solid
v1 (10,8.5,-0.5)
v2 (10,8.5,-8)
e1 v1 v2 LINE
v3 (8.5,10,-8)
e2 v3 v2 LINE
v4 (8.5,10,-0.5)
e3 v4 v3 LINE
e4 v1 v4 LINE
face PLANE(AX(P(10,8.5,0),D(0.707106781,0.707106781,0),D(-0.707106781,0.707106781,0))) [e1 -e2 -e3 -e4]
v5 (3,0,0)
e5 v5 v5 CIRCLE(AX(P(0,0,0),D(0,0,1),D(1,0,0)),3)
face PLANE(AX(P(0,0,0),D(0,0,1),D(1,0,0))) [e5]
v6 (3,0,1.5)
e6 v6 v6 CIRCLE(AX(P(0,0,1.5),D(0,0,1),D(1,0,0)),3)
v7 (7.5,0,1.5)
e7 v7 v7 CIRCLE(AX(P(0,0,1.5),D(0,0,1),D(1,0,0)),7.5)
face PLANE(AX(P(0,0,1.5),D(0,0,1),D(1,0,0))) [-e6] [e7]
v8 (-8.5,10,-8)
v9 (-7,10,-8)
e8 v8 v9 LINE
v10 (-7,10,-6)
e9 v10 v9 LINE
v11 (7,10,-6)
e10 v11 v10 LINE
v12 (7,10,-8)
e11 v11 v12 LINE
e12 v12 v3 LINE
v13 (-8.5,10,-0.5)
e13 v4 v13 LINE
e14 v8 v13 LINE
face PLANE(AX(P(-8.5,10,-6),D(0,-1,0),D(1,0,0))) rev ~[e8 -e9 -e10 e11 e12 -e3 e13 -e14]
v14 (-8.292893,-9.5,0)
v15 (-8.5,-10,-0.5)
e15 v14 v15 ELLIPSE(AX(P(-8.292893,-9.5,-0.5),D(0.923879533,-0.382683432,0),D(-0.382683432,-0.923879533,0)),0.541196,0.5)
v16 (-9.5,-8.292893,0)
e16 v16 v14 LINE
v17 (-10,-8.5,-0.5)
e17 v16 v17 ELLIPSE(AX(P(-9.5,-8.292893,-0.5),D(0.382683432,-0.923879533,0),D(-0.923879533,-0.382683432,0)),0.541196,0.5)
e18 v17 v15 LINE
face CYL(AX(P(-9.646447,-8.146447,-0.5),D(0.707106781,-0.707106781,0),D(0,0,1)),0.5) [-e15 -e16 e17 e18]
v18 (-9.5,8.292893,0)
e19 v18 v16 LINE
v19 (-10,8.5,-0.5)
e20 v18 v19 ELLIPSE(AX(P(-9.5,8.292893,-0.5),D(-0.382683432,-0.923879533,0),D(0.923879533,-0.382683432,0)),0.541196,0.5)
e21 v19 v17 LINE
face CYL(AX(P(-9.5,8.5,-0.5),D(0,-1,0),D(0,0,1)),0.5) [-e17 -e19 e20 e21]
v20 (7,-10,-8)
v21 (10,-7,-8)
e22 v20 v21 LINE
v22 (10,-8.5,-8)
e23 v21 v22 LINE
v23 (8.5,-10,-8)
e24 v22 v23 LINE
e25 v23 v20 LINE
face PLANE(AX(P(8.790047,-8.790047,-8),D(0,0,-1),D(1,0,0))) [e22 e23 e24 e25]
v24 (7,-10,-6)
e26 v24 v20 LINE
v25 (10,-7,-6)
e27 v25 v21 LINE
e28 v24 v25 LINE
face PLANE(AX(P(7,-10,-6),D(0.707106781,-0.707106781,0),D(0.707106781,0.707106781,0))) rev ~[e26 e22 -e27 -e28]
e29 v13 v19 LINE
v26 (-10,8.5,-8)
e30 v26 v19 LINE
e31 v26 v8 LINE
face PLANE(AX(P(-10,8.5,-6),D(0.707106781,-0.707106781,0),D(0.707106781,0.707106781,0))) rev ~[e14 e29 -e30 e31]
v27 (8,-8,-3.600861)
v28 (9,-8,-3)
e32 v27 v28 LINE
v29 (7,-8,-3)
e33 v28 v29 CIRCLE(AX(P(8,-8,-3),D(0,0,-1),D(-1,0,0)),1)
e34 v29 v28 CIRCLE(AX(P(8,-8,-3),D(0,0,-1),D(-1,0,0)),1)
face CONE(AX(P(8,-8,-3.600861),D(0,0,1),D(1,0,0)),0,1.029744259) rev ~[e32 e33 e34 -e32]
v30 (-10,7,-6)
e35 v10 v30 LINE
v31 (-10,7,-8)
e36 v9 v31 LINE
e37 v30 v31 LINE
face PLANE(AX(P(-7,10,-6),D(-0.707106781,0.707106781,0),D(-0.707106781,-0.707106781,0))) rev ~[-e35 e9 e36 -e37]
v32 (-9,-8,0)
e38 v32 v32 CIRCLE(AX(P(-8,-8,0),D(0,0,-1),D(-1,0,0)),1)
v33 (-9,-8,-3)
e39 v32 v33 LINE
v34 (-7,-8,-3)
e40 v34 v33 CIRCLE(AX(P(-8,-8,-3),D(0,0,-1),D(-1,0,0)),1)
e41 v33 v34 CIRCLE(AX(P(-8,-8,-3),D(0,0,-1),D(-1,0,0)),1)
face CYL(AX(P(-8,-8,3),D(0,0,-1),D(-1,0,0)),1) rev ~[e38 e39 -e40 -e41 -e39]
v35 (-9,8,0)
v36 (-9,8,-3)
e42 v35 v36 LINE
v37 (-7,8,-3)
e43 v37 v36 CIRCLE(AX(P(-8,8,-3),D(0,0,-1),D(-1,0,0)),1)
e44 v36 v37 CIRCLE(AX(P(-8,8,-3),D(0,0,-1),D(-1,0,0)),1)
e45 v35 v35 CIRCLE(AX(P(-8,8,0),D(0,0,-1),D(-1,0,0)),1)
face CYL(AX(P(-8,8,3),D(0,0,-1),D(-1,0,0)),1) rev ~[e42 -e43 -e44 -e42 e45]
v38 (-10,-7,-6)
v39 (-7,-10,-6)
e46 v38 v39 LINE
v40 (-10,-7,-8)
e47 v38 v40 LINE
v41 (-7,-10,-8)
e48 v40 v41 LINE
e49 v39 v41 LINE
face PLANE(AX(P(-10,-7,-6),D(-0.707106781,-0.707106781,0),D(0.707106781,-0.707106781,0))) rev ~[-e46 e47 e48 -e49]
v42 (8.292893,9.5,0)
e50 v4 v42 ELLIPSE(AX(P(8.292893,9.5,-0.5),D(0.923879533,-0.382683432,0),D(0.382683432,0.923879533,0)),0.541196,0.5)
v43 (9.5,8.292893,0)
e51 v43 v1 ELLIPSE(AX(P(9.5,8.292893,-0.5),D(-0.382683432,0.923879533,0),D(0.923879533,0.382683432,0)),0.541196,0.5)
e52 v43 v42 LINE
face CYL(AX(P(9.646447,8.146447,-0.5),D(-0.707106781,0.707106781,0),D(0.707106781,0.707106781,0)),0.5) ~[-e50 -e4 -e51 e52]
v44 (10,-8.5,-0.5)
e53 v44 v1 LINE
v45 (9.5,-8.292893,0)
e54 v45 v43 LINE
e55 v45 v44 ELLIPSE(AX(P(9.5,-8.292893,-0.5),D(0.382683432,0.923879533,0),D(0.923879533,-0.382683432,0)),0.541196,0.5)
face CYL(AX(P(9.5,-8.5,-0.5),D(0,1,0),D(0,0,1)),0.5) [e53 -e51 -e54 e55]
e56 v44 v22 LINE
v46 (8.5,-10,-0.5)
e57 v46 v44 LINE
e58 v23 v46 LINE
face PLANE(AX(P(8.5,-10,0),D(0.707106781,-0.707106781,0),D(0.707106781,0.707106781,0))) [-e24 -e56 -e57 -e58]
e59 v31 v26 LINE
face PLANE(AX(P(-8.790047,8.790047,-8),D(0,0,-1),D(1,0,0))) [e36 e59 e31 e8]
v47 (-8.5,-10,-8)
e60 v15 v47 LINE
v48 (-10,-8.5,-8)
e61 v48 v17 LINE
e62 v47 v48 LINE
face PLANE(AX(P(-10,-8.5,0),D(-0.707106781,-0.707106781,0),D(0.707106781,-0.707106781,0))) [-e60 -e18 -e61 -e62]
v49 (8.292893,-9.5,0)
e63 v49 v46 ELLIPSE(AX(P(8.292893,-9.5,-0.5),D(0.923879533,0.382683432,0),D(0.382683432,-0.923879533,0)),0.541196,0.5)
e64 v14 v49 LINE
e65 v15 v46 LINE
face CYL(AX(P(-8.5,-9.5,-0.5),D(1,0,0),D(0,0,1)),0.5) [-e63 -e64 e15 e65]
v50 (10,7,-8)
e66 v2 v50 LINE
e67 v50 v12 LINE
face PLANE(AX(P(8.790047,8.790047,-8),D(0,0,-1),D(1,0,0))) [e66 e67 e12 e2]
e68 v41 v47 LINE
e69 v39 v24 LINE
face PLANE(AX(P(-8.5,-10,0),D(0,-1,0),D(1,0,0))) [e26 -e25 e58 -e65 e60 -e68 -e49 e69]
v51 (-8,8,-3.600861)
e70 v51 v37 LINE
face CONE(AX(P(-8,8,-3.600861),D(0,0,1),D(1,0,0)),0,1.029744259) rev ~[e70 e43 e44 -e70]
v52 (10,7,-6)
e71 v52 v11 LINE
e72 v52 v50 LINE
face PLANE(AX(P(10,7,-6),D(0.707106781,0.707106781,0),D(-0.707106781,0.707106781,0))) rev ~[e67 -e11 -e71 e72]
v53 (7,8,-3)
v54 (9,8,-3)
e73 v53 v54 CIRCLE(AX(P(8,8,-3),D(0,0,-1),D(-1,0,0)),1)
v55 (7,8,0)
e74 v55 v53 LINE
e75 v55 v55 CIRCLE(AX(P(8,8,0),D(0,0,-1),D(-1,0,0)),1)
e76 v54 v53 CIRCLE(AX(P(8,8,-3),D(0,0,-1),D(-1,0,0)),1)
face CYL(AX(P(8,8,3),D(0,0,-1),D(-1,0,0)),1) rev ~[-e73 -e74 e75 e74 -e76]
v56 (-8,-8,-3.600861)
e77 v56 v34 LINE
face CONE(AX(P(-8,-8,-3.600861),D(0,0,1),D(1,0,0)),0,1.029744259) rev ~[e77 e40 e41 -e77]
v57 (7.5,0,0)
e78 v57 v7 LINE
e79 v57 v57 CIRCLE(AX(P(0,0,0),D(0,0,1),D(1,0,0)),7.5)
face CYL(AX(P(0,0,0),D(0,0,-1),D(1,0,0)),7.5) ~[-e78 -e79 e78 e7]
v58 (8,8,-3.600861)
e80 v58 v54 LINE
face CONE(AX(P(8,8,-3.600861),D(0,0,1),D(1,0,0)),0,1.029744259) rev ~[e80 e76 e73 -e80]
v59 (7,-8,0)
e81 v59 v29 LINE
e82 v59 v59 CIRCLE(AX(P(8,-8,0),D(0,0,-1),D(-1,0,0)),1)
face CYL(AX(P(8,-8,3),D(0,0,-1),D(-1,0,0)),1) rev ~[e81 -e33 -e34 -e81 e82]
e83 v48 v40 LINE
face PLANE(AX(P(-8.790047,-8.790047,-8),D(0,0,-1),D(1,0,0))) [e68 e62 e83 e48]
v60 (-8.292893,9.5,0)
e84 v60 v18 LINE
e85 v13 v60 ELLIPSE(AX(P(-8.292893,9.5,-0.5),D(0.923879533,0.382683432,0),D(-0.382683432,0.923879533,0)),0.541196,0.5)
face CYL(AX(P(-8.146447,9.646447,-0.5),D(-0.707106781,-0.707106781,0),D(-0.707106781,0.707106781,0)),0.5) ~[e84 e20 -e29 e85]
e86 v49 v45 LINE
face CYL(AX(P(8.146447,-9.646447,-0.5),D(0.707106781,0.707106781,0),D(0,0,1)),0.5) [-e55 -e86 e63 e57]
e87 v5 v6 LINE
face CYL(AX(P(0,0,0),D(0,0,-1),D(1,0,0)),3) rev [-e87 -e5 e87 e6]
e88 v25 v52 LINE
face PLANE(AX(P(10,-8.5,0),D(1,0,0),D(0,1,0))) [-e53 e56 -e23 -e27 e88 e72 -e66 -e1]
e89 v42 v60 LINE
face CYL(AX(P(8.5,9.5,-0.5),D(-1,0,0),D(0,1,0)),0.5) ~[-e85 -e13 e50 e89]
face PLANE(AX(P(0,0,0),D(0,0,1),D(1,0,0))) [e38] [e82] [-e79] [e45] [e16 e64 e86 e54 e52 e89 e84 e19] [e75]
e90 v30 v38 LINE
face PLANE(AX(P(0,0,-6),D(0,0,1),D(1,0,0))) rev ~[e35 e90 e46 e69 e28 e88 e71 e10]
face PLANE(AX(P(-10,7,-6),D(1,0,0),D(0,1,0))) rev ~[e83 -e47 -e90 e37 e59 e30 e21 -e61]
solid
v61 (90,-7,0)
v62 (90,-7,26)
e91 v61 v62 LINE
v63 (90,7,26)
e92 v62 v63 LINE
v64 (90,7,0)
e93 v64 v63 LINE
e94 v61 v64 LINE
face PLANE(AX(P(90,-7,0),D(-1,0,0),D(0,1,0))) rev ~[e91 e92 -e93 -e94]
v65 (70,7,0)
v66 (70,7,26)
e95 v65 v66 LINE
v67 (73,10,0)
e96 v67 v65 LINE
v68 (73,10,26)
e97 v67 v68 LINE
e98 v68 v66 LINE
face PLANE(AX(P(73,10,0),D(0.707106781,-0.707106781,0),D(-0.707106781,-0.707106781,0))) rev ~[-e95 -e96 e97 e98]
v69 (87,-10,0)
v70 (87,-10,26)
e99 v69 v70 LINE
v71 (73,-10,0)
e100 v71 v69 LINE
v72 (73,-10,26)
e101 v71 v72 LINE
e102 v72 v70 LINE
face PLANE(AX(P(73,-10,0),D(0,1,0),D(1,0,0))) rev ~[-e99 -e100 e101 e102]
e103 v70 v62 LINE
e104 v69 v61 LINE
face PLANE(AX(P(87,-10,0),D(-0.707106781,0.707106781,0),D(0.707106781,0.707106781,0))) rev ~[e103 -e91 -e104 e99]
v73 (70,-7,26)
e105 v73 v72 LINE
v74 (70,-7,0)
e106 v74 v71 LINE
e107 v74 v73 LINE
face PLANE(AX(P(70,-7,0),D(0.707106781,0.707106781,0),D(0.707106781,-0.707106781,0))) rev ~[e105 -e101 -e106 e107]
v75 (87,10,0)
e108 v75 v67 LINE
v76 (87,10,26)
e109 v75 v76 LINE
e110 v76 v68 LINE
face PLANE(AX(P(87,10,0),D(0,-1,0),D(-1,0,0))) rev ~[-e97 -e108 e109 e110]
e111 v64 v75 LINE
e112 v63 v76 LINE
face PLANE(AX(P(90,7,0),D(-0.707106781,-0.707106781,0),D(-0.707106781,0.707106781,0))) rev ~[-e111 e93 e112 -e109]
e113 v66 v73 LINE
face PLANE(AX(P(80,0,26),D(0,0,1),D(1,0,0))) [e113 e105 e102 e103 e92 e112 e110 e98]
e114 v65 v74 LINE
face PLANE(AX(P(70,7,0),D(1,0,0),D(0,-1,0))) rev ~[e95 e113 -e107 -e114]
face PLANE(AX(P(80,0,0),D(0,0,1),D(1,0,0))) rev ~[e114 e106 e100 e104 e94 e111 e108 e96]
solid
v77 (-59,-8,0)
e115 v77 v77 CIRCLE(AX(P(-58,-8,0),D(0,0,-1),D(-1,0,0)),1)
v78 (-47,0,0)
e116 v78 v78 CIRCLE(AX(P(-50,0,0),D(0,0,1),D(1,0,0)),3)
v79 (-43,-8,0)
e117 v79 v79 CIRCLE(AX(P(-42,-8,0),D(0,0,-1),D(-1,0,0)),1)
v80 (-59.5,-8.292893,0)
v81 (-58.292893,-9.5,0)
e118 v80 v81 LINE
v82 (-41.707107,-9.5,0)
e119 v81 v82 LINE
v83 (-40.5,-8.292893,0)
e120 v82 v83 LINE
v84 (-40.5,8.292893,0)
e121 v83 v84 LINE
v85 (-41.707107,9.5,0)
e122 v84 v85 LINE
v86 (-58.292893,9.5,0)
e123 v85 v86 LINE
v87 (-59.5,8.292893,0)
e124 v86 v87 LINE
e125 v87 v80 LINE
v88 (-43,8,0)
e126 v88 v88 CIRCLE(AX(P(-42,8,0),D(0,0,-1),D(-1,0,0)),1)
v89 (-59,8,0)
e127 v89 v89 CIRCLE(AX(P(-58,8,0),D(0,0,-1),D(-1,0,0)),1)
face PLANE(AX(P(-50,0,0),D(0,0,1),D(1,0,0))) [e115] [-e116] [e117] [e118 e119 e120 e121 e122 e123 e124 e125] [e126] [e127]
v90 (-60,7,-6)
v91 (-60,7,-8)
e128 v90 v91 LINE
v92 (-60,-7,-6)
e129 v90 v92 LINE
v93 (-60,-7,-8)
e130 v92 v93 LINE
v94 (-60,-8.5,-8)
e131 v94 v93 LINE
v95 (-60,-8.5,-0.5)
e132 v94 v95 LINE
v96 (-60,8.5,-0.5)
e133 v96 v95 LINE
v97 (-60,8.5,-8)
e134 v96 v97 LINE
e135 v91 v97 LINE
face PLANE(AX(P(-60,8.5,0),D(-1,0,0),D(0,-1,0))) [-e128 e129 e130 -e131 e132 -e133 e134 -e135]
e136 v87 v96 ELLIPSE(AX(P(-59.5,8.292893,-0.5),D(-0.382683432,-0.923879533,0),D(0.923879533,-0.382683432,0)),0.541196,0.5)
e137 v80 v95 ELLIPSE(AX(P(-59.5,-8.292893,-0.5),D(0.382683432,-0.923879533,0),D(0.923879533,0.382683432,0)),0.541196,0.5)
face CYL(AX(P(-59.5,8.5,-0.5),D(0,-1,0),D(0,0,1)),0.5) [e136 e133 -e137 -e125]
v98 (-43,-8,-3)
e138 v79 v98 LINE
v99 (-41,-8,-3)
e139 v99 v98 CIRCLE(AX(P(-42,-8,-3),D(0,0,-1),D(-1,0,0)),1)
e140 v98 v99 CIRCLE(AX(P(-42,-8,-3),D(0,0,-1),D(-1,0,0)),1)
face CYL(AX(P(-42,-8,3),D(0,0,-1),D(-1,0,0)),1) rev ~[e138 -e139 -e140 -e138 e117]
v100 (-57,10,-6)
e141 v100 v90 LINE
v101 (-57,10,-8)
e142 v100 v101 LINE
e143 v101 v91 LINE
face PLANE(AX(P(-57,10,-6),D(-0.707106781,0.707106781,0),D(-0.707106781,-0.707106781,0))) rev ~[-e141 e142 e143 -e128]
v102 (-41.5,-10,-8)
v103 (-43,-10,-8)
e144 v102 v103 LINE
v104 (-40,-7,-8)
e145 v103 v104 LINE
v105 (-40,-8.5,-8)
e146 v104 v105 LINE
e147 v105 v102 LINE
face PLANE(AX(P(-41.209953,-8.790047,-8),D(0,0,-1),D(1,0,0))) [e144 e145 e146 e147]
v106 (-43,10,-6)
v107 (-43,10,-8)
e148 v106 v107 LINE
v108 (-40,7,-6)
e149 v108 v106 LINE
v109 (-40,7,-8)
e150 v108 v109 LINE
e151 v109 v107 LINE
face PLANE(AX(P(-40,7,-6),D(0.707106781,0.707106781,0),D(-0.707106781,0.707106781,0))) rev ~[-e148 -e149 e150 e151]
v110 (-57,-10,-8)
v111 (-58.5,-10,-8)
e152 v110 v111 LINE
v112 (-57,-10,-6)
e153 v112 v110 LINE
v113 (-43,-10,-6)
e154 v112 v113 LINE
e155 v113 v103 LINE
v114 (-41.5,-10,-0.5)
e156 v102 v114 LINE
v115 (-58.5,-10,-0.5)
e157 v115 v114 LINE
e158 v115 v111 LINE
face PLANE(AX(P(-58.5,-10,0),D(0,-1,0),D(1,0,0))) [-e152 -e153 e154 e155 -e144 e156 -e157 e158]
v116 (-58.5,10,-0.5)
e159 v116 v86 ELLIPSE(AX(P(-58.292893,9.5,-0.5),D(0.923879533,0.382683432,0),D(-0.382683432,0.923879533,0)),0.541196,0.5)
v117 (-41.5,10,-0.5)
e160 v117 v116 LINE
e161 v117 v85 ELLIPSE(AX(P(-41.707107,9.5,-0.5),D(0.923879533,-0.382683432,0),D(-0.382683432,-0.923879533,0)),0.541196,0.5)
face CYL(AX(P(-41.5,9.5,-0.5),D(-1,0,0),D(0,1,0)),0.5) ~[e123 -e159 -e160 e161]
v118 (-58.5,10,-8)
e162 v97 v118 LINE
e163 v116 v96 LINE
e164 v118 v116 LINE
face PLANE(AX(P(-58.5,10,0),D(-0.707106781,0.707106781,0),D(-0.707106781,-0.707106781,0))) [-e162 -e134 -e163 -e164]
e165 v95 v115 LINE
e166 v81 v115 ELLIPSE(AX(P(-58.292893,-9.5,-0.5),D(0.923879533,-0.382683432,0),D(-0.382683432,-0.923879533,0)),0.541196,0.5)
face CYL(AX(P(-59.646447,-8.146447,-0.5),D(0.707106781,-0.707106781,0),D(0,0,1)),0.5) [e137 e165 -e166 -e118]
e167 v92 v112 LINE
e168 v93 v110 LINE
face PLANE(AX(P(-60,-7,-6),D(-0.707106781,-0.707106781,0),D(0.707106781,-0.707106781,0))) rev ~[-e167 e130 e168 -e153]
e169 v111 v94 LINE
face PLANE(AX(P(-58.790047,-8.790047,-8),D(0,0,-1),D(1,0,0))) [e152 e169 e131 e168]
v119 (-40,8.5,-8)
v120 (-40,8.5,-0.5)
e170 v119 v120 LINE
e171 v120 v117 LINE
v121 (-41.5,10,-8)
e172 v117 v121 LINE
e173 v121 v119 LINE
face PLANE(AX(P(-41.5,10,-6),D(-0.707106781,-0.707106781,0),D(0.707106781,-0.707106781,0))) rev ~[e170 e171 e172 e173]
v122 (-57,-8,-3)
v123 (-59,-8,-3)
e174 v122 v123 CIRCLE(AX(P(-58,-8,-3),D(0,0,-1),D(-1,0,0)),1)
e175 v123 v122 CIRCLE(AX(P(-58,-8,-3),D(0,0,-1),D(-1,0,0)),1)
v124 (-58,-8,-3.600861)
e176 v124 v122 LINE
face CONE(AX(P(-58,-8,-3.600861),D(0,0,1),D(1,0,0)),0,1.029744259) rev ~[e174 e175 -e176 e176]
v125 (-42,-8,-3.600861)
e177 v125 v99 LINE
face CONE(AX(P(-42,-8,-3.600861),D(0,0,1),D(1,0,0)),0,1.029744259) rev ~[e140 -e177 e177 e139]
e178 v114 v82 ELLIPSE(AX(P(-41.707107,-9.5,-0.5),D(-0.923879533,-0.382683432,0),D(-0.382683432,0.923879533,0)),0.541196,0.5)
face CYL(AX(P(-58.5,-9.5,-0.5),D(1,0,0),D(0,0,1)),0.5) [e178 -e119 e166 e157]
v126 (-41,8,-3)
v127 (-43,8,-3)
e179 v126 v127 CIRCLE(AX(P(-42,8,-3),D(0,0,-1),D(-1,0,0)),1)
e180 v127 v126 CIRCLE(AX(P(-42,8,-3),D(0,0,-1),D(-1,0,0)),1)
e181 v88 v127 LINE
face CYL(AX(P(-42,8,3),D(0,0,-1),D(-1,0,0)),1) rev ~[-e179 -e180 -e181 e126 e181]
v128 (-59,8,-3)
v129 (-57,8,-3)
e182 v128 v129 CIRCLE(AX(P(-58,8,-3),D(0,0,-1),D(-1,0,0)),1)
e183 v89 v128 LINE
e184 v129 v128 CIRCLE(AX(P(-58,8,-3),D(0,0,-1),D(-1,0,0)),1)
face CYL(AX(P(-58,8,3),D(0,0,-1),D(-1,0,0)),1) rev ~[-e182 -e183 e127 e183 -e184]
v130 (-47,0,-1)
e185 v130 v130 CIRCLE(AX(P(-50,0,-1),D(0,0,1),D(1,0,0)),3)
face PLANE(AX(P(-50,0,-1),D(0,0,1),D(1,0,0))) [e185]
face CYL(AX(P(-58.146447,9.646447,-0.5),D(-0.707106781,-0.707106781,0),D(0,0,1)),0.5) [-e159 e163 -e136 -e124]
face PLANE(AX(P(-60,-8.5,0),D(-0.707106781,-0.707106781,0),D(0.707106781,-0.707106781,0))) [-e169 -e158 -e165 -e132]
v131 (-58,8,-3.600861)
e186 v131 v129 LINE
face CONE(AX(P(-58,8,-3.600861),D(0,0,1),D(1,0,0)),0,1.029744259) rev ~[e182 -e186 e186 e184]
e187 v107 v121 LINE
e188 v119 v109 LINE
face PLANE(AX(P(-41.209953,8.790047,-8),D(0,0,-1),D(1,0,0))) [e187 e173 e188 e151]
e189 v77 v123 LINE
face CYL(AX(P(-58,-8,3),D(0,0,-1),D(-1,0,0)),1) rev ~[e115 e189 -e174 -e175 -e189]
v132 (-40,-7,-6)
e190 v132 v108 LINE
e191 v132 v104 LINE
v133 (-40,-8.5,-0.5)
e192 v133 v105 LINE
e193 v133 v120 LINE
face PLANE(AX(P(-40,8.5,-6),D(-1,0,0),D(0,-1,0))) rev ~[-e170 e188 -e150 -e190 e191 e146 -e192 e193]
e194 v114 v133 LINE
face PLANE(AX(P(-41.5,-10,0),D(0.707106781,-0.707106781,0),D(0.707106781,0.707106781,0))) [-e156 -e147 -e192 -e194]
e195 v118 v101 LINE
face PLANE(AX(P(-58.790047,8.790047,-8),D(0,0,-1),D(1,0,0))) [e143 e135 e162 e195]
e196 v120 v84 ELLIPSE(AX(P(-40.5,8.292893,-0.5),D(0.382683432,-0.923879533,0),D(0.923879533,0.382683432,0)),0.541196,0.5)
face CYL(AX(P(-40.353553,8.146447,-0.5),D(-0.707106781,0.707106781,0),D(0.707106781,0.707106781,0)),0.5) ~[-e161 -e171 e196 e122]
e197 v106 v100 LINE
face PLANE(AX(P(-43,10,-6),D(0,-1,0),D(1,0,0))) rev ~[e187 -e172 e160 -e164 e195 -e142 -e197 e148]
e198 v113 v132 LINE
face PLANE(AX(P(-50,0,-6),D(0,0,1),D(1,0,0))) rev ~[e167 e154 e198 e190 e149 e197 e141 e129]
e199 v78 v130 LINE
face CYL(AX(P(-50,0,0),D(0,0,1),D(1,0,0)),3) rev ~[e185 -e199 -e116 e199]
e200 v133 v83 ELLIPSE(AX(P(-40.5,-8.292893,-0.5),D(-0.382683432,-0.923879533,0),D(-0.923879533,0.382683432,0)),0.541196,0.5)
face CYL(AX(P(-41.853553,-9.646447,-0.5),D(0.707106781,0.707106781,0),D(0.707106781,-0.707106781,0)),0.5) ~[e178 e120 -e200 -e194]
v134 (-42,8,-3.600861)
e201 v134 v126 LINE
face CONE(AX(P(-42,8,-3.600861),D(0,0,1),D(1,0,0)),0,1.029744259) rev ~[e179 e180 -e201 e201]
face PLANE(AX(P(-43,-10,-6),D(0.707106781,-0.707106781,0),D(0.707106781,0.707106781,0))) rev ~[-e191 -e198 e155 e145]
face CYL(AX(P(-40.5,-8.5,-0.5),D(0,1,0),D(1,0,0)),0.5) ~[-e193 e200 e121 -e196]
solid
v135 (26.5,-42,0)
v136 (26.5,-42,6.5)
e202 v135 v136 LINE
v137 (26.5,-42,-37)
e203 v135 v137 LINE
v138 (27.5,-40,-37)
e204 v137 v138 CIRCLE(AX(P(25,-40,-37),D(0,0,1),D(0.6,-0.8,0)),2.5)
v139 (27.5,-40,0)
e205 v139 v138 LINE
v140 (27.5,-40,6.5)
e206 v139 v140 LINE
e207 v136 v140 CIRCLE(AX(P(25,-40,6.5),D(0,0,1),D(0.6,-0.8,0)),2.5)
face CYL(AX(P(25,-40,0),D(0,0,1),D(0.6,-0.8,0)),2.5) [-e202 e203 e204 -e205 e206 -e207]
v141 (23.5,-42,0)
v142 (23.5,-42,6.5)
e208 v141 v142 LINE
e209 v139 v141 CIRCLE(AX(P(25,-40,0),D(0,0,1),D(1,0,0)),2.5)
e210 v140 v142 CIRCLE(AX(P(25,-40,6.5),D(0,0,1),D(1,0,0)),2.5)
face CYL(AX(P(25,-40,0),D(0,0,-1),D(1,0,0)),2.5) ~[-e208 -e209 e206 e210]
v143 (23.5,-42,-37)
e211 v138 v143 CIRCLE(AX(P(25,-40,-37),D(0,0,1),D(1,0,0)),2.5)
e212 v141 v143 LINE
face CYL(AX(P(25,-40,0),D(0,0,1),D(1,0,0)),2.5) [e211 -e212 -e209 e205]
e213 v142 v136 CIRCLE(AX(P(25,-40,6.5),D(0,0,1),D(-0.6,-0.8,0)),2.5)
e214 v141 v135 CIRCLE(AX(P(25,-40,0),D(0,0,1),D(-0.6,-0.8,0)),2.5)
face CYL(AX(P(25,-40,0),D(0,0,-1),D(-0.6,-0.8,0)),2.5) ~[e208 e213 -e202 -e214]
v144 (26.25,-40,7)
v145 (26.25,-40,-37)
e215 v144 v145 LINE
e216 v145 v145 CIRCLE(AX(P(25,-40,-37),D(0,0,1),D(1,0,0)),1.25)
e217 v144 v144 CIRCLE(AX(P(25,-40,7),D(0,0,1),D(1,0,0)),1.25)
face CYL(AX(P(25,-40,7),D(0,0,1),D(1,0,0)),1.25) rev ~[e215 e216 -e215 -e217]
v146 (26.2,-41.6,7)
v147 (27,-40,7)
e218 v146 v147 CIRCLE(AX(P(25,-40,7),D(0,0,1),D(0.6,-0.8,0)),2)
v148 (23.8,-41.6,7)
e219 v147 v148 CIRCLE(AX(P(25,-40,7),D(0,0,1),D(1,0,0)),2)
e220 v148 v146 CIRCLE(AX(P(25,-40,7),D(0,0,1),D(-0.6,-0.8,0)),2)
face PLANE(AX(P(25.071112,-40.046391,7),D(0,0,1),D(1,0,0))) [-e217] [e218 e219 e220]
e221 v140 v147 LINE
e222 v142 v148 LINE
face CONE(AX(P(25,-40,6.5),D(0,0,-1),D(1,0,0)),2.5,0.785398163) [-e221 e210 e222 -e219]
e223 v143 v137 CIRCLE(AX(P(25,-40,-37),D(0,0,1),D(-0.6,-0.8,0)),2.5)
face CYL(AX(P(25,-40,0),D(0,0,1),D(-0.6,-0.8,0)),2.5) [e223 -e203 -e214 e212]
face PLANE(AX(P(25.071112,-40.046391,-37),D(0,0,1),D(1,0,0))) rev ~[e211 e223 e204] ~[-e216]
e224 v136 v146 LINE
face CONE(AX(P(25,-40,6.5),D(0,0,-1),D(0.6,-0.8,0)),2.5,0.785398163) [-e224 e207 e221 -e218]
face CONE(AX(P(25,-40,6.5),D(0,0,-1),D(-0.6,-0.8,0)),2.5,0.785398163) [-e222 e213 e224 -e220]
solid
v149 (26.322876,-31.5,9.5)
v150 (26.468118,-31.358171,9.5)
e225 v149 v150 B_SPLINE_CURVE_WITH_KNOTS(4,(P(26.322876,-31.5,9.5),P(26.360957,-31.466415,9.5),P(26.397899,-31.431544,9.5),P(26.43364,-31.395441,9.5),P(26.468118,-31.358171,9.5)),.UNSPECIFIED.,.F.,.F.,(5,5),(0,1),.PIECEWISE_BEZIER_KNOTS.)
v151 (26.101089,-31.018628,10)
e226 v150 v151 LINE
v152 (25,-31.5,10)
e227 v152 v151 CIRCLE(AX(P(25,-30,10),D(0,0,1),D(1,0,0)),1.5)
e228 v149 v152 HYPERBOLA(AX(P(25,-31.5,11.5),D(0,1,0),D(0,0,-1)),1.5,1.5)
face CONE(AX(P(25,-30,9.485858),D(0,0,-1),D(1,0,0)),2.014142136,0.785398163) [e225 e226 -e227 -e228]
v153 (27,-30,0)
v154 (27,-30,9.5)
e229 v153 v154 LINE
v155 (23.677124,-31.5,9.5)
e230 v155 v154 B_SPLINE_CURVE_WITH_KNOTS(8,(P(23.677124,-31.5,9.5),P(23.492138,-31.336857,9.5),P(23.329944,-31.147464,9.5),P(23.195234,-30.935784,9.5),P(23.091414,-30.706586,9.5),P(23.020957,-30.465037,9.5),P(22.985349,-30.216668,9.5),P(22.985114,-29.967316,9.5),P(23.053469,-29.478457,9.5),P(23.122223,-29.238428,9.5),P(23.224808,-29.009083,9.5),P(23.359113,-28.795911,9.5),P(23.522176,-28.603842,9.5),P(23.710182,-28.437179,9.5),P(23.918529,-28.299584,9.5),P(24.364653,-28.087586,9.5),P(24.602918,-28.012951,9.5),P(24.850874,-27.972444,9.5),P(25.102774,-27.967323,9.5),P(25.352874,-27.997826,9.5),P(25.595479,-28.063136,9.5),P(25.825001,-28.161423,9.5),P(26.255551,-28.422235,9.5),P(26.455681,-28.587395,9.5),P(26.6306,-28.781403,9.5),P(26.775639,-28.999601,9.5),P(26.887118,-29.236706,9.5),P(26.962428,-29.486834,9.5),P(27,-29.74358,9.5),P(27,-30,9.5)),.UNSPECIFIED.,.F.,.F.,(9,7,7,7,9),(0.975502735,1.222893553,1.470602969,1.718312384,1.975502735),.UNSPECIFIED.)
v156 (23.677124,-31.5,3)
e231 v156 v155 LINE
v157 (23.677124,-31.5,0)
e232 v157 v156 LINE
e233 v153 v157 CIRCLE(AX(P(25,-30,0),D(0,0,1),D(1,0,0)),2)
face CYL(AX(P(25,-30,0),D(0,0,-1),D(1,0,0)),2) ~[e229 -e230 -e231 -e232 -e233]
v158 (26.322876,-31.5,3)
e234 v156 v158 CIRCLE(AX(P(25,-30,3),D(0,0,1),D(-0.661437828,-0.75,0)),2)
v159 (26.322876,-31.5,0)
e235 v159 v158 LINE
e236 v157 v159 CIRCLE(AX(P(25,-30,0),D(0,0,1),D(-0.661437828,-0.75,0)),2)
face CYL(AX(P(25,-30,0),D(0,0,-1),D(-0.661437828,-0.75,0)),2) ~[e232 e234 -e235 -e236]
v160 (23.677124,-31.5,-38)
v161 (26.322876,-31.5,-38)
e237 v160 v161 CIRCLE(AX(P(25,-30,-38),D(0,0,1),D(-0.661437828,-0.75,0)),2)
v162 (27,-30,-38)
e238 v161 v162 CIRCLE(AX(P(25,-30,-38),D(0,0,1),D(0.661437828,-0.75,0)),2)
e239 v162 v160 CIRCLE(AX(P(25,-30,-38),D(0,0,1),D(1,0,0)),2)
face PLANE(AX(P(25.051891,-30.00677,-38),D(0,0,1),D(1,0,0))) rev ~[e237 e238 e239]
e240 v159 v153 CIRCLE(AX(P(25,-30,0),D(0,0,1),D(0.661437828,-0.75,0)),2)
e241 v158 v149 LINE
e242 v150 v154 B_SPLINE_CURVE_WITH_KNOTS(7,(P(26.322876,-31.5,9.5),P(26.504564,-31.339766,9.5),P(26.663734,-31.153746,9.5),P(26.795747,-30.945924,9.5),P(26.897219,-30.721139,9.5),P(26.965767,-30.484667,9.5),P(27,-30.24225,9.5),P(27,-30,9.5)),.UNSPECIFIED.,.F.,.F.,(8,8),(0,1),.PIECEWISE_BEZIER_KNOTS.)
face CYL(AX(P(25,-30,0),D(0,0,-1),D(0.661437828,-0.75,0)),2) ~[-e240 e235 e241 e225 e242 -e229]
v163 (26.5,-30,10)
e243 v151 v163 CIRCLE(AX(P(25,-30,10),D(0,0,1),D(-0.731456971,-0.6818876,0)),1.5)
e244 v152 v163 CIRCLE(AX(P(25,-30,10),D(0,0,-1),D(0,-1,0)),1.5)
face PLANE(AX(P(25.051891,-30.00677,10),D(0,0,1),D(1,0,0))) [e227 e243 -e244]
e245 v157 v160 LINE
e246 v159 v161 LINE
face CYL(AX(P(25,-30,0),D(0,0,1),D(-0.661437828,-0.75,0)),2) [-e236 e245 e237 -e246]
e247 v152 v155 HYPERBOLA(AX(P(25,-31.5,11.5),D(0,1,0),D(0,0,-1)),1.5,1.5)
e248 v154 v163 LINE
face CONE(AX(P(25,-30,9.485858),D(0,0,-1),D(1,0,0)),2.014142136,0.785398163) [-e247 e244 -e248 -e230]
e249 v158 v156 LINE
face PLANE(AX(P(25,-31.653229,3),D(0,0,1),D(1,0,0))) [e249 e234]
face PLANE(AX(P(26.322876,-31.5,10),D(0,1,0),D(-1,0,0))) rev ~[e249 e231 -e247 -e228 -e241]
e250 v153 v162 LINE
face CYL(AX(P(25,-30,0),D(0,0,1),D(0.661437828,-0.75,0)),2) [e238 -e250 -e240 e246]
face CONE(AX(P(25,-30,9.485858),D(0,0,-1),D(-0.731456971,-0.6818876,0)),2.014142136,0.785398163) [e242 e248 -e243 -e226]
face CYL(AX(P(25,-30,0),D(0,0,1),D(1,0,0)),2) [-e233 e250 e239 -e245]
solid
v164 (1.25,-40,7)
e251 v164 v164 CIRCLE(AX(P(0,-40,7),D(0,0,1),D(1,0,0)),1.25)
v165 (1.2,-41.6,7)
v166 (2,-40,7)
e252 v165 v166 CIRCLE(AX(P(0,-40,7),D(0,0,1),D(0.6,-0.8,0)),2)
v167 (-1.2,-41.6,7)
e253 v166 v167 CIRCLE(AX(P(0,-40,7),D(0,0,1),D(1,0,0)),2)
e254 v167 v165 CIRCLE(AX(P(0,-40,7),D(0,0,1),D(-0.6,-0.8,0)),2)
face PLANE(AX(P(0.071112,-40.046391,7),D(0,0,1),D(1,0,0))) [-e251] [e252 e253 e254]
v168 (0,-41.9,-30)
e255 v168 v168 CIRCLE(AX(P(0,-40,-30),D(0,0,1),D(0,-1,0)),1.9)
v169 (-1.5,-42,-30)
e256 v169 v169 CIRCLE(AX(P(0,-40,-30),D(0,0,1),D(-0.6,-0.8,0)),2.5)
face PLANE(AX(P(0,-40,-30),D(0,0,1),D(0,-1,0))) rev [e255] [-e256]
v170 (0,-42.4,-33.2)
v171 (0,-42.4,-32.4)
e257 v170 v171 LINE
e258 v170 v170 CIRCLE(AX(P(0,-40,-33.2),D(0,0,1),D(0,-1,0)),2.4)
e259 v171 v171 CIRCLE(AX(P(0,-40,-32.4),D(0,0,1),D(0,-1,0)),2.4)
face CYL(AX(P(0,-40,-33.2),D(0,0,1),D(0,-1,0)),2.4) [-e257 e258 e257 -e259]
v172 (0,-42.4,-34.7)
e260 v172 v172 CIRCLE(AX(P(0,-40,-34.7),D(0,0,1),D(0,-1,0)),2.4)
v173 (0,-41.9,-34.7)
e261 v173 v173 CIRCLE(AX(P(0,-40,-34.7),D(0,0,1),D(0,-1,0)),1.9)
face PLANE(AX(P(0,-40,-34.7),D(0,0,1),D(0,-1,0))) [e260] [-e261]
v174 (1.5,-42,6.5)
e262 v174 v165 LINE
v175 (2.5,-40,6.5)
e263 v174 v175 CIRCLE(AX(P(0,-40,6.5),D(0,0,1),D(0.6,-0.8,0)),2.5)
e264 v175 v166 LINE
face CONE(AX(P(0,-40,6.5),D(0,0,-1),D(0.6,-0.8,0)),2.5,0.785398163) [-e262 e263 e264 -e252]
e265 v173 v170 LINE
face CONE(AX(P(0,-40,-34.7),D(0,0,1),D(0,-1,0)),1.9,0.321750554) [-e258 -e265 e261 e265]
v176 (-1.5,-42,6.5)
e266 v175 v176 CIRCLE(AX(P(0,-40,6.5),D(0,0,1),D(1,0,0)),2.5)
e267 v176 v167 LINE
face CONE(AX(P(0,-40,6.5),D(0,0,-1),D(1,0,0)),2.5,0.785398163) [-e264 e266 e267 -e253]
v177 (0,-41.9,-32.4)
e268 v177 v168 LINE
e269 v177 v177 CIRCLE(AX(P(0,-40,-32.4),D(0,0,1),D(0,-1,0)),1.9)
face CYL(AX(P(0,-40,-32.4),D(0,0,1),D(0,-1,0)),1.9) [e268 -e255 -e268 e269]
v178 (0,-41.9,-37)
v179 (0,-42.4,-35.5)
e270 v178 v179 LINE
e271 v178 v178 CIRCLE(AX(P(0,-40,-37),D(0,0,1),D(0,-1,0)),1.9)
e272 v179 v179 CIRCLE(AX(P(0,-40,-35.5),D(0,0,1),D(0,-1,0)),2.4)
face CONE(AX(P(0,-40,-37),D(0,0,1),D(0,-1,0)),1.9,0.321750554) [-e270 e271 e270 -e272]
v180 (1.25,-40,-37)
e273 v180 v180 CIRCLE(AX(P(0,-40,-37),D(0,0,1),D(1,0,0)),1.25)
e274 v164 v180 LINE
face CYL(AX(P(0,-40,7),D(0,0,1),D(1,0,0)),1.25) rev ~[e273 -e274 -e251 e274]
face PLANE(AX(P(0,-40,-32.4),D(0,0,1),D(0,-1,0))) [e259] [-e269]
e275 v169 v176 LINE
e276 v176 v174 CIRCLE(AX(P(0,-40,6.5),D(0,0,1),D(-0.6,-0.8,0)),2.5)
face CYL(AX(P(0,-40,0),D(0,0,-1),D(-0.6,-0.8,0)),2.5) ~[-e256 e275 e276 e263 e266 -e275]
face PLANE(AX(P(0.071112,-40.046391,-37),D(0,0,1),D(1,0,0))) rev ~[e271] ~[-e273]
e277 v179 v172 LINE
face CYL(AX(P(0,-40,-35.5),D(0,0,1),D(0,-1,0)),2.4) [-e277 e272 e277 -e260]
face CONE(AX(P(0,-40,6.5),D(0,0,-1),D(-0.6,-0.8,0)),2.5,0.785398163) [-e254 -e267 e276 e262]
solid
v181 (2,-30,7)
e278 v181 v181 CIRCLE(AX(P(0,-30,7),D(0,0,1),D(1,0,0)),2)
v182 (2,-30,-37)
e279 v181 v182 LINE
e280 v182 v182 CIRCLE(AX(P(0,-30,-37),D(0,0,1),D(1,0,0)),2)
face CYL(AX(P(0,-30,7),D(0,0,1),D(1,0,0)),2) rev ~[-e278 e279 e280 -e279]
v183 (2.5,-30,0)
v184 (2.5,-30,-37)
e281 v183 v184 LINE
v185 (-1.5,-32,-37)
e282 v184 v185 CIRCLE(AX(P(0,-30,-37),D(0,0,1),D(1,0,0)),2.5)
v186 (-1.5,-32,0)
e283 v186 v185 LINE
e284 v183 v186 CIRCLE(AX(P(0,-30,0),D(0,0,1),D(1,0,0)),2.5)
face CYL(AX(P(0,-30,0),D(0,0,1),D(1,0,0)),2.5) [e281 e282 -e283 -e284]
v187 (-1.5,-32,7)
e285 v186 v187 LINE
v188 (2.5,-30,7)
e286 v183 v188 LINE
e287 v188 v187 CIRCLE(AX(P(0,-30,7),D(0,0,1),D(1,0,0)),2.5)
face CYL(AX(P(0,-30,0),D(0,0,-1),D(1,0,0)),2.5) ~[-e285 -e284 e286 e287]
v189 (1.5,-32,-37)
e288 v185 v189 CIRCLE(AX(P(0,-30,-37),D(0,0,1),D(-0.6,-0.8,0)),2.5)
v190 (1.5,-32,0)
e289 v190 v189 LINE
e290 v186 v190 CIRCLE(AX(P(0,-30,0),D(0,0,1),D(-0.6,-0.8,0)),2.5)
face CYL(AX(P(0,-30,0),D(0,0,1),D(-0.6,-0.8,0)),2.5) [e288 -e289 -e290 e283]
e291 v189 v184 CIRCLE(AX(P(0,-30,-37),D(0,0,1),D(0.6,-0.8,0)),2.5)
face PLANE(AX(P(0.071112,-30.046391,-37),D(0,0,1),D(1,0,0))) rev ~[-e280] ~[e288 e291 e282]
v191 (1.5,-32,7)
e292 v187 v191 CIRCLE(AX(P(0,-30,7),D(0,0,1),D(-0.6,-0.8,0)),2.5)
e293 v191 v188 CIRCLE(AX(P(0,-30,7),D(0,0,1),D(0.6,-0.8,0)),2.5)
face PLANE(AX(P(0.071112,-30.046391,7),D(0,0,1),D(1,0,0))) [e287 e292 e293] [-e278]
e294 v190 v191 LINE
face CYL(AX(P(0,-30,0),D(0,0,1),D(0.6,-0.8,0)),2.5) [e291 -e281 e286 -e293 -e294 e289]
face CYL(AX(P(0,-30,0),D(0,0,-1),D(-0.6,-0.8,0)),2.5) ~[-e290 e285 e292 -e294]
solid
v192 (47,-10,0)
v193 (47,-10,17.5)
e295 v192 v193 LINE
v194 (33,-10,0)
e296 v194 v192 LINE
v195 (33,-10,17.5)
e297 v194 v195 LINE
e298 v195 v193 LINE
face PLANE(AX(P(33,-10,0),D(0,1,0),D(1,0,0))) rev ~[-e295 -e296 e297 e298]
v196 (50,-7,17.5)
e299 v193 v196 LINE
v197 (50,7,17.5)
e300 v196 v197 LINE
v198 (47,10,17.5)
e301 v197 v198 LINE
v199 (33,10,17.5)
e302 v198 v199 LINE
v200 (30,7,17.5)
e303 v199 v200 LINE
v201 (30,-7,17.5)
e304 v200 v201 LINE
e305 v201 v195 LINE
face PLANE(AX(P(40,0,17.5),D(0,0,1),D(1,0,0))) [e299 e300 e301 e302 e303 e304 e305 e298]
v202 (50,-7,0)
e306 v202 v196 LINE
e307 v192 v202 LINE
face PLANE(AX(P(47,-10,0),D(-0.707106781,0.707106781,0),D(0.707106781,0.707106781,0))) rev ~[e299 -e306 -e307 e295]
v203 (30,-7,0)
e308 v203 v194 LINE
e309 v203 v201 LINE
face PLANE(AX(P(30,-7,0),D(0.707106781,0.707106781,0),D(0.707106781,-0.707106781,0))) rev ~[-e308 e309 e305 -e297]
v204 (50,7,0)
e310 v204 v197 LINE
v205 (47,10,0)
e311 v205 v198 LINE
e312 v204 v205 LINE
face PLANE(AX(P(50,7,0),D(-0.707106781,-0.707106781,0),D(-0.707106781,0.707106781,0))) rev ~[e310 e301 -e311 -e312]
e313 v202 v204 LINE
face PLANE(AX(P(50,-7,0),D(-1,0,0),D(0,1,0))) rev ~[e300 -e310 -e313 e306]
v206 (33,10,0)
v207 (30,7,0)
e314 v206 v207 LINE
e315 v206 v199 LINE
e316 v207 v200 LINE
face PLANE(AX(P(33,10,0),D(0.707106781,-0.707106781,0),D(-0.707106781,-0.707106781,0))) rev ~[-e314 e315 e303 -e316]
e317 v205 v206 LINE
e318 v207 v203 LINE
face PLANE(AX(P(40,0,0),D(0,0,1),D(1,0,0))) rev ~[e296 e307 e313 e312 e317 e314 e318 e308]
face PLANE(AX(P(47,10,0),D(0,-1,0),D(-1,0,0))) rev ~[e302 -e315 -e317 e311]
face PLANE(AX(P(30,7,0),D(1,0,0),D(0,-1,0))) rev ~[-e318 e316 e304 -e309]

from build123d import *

# Parameters (mm, degrees)
F0_R         = 3
F1_DEPTH     = 6
F0_R_2       = 7.5
F2_DEPTH     = 1.5
F3_DEPTH     = 1
F5_DEPTH     = 2
F6_D         = 2
F6_DEPTH     = 3
F6_TIP       = 0.600860619
F6_2_D       = 2
F6_2_DEPTH   = 3
F6_2_TIP     = 0.600860619
F7_DEPTH     = 17.5
F8_DEPTH     = 7
F9_R         = 0.5
F9_2_R       = 0.5
F10_SIZE     = 0.5
F10_2_SIZE   = 0.5
F11_DEPTH    = 37
F12_R        = 1.25
F12_R_2      = 2
F13_DEPTH    = 44.001
F16_DEPTH    = 26
F18_DEPTH    = 10
F20_DEPTH    = 7
F21_T2_ANGLE = 317.2277824927
F21_T4_ANGLE = 137.0086765411
F22_DEPTH    = 38


# Not quite as in the source:
# - a fillet or chamfer that OpenCascade refuses, or shapes differently, is made with other operations: its cross-section is extruded or revolved along the edge and cut away or added


with BuildPart() as f1:
    # F0 (on Top) → F1 (new body)
    with BuildSketch(Plane.XY):
        Polygon((-60, 7), (-60, -7), (-57, -10), (-43, -10), (-40, -7), (-40, 7), (-43, 10), (-57, 10), align=None)
        with Locations((-50, 0)):
            Circle(F0_R, mode=Mode.SUBTRACT)
        Polygon((-41.5, 10), (-43, 10), (-40, 7), (-40, 8.5), align=None)
        Polygon((-60, 8.5), (-60, 7), (-57, 10), (-58.5, 10), align=None)
        Polygon((-60, -7), (-60, -8.5), (-58.5, -10), (-57, -10), align=None)
        Polygon((-40, -7), (-43, -10), (-41.5, -10), (-40, -8.5), align=None)
        with Locations((-50, 0)):
            Circle(F0_R)
    extrude(amount=-F1_DEPTH)

    # F0 (on Top) → F3 (cut)
    with BuildSketch(Plane.XY):
        with Locations((-50, 0)):
            Circle(F0_R)
    extrude(amount=-F3_DEPTH, mode=Mode.SUBTRACT)

    # F4 (on face) → F5 (join)
    with BuildSketch(Plane(origin=(0, 0, -6), x_dir=(1, 0, 0), z_dir=(0, 0, -1))):
        Polygon((-40, -7), (-43, -10), (-41.5, -10), (-40, -8.5), align=None)
        Polygon((-58.5, -10), (-57, -10), (-60, -7), (-60, -8.5), align=None)
        Polygon((-60, 7), (-57, 10), (-58.5, 10), (-60, 8.5), align=None)
        Polygon((-40, 7), (-40, 8.5), (-41.5, 10), (-43, 10), align=None)
    extrude(amount=F5_DEPTH)

    # F6
    with Locations(Plane.XY):
        with Locations((-8, -8), (8, -8), (8, 8), (-8, 8), (-42, -8), (-42, 8), (-58, 8), (-58, -8)):
            Hole(F6_D / 2, depth=F6_DEPTH)
            with Locations((0, 0, -(F6_DEPTH + F6_TIP / 2))):  # 118° drill point
                Cone(0, F6_D / 2, F6_TIP, mode=Mode.SUBTRACT)

    # F9
    f9_edges = [f1.edges().sort_by_distance(p)[0] for p in [
        (-40, 0, 0),
        (-40.75, -9.25, 0),
        (-59.25, -9.25, 0),
        (-60, 0, 0),
        (-50, -10, 0),
        (-50, 10, 0),
        (-40.75, 9.25, 0),
        (-59.25, 9.25, 0),
    ]]
    fillet(f9_edges, radius=F9_R)


with BuildPart() as f1b:
    # F0 (on Top) → F1, piece 2 (new body)
    with BuildSketch(Plane.XY):
        Polygon((-7, -10), (7, -10), (10, -7), (10, 7), (7, 10), (-7, 10), (-10, 7), (-10, -7), align=None)
        Circle(F0_R_2, mode=Mode.SUBTRACT)
        Circle(F0_R_2)
        Circle(F0_R, mode=Mode.SUBTRACT)
        Polygon((-8.5, -10), (-7, -10), (-10, -7), (-10, -8.5), align=None)
        Polygon((-10, 8.5), (-10, 7), (-7, 10), (-8.5, 10), align=None)
        Polygon((7, 10), (10, 7), (10, 8.5), (8.5, 10), align=None)
        Polygon((7, -10), (8.5, -10), (10, -8.5), (10, -7), align=None)
        Circle(F0_R)
    extrude(amount=-F1_DEPTH)

    # F0 (on Top) → F2 (join)
    with BuildSketch(Plane.XY):
        Circle(F0_R_2)
        Circle(F0_R, mode=Mode.SUBTRACT)
    extrude(amount=F2_DEPTH)

    # F4 (on face) → F5, piece 2 (join)
    with BuildSketch(Plane(origin=(0, 0, -6), x_dir=(1, 0, 0), z_dir=(0, 0, -1))):
        Polygon((-8.5, -10), (-7, -10), (-10, -7), (-10, -8.5), align=None)
        Polygon((10, -7), (7, -10), (8.5, -10), (10, -8.5), align=None)
        Polygon((7, 10), (10, 7), (10, 8.5), (8.5, 10), align=None)
        Polygon((-10, 8.5), (-10, 7), (-7, 10), (-8.5, 10), align=None)
    extrude(amount=F5_DEPTH)

    # F6#2
    with Locations(Plane.XY):
        with Locations((-8, -8), (8, -8), (8, 8), (-8, 8), (-42, -8), (-42, 8), (-58, 8), (-58, -8)):
            Hole(F6_2_D / 2, depth=F6_2_DEPTH)
            with Locations((0, 0, -(F6_2_DEPTH + F6_2_TIP / 2))):  # 118° drill point
                Cone(0, F6_2_D / 2, F6_2_TIP, mode=Mode.SUBTRACT)

    # F9#2
    f9_2_edges = [f1b.edges().sort_by_distance(p)[0] for p in [
        (-10, 0, 0),
        (-9.25, -9.25, 0),
        (0, -10, 0),
        (9.25, -9.25, 0),
        (10, 0, 0),
        (9.25, 9.25, 0),
        (0, 10, 0),
        (-9.25, 9.25, 0),
    ]]
    fillet(f9_2_edges, radius=F9_2_R)


with BuildPart() as f7:
    # F0 (on Top) → F7 (new body)
    with BuildSketch(Plane.XY):
        Polygon((33, -10), (47, -10), (50, -7), (50, 7), (47, 10), (33, 10), (30, 7), (30, -7), align=None)
    extrude(amount=F7_DEPTH)


with BuildPart() as f8:
    # F0 (on Top) → F8 (new body)
    with BuildSketch(Plane.XY):
        with BuildLine():
            ThreePointArc((1.5, -32), (2.2360679775, -31.1180339887), (2.5, -30))
            ThreePointArc((2.5, -30), (-1.1180339887, -27.7639320225), (-1.5, -32))
            Line((-1.5, -32), (1.5, -32))
        make_face()
        with BuildLine():
            Line((1.5, -32), (-1.5, -32))
            ThreePointArc((-1.5, -32), (0, -32.5), (1.5, -32))
        make_face()
    extrude(amount=F8_DEPTH)

    # F11#2 (add): a face of the model
    f11_2_faces = [f8.faces().sort_by_distance(p)[0] for p in [
        (0, -30, 0),
    ]]
    extrude(f11_2_faces, amount=F11_DEPTH)


with BuildPart() as f8b:
    # F0 (on Top) → F8, piece 2 (new body)
    with BuildSketch(Plane.XY):
        with BuildLine():
            ThreePointArc((1.5, -42), (2.2360679775, -41.1180339887), (2.5, -40))
            ThreePointArc((2.5, -40), (-1.1180339887, -37.7639320225), (-1.5, -42))
            Line((-1.5, -42), (1.5, -42))
        make_face()
        with BuildLine():
            Line((1.5, -42), (-1.5, -42))
            ThreePointArc((-1.5, -42), (0, -42.5), (1.5, -42))
        make_face()
    extrude(amount=F8_DEPTH)

    # F10
    f10_edges = [f8b.edges().sort_by_distance(p)[0] for p in [
        (-2.5, -40, 7),
    ]]
    chamfer(f10_edges, length=F10_SIZE)

    # F11 (add): a face of the model
    f11_faces = [f8b.faces().sort_by_distance(p)[0] for p in [
        (0, -40, 0),
    ]]
    extrude(f11_faces, amount=F11_DEPTH)


with BuildPart() as f8c:
    # F0 (on Top) → F8, piece 3 (new body)
    with BuildSketch(Plane.XY):
        with BuildLine():
            ThreePointArc((26.5, -42), (27.2360679775, -41.1180339887), (27.5, -40))
            ThreePointArc((27.5, -40), (23.8819660113, -37.7639320225), (23.5, -42))
            Line((23.5, -42), (26.5, -42))
        make_face()
        with BuildLine():
            Line((26.5, -42), (23.5, -42))
            ThreePointArc((23.5, -42), (25, -42.5), (26.5, -42))
        make_face()
    extrude(amount=F8_DEPTH)

    # F10#2
    f10_2_edges = [f8c.edges().sort_by_distance(p)[0] for p in [
        (22.5, -40, 7),
    ]]
    chamfer(f10_2_edges, length=F10_2_SIZE)

    # F11#3 (add): a face of the model
    f11_3_faces = [f8c.faces().sort_by_distance(p)[0] for p in [
        (25, -40, 0),
    ]]
    extrude(f11_3_faces, amount=F11_DEPTH)


with BuildPart() as f13_tool:
    # F12 (on face) → F13 (new body, through all)
    with BuildSketch(Plane.XY.offset(7)):
        with Locations((0, -40)):
            Circle(F12_R)
        with Locations((0, -30)):
            Circle(F12_R_2)
        with Locations((25, -40)):
            Circle(F12_R)
    extrude(amount=-F13_DEPTH)


with BuildPart() as f8_1:
    add(f8.part)

    # F13: cut by f13_tool
    add(f13_tool.part, mode=Mode.SUBTRACT)


with BuildPart() as f8b_1:
    add(f8b.part)

    # F13: cut by f13_tool
    add(f13_tool.part, mode=Mode.SUBTRACT)

    # F14 (on Right) → F15 (revolve, cut)
    with BuildSketch(Plane.YZ):
        Polygon((-42.5, -30), (-42.5, -32.4), (-42.4, -32.4), (-41.9, -32.4), (-41.9, -30), align=None)
        Polygon((-42.5, -32.4), (-42.5, -37), (-41.9, -37), (-42.4, -35.5), (-42.4, -34.7), (-41.9, -34.7), (-42.4, -33.2), (-42.4, -32.4), align=None)
    revolve(axis=Axis((0, -40, -33.5), (0, 0, 1)), mode=Mode.SUBTRACT)


with BuildPart() as f8c_1:
    add(f8c.part)

    # F13: cut by f13_tool
    add(f13_tool.part, mode=Mode.SUBTRACT)


with BuildPart() as f16:
    # F0 (on Top) → F16 (new body)
    with BuildSketch(Plane.XY):
        Polygon((73, -10), (87, -10), (90, -7), (90, 7), (87, 10), (73, 10), (70, 7), (70, -7), align=None)
    extrude(amount=F16_DEPTH)


with BuildPart() as f18:
    # F17 (on Top) → F18 (new body)
    with BuildSketch(Plane.XY):
        with BuildLine():
            ThreePointArc((26.3228756555, -31.5), (26.8228756555, -30.8228756555), (27, -30))
            ThreePointArc((27, -30), (24.1771243445, -28.1771243445), (23.6771243445, -31.5))
            Line((23.6771243445, -31.5), (26.3228756555, -31.5))
        make_face()
        with BuildLine():
            Line((26.3228756555, -31.5), (23.6771243445, -31.5))
            ThreePointArc((23.6771243445, -31.5), (25, -32), (26.3228756555, -31.5))
        make_face()
    extrude(amount=F18_DEPTH)

    # F19 (on face) → F20 (cut)
    with BuildSketch(Plane.XY.offset(10)):
        with BuildLine():
            Line((26.3228756555, -31.5), (23.6771243445, -31.5))
            ThreePointArc((23.6771243445, -31.5), (25, -32), (26.3228756555, -31.5))
        make_face()
    extrude(amount=-F20_DEPTH, mode=Mode.SUBTRACT)

    # F21: chamfer of 0.5 on 2 edges, made by hand

    # F21_s1 → F21_t2 (revolve, cut)
    with BuildSketch(Plane.XZ.offset(30)):
        with BuildLine():
            Line((27.0141421356, 9.4858578644), (26.4858578644, 10.0141421356))
            Line((26.4858578644, 10.0141421356), (26.4858578644, 10.0241421356))
            ThreePointArc((26.4858578644, 10.0241421356), (26.7429289322, 10.01), (27, 10.01))
            Line((27, 10.01), (27.01, 10))
            ThreePointArc((27.01, 10), (27.01, 9.7429289322), (27.0241421356, 9.4858578644))
            Line((27.0241421356, 9.4858578644), (27.0141421356, 9.4858578644))
        make_face()
    revolve(axis=Axis((25, -30, 10), (0, 0, 1)), revolution_arc=F21_T2_ANGLE, mode=Mode.SUBTRACT)

    # F21_s3 → F21_t4 (revolve, cut)
    with BuildSketch(Plane(origin=(26.5874106472, -28.5201649863, 0), x_dir=(0, 0, 1), z_dir=(-0.6818876003, 0.7314569711, 0))):
        with BuildLine():
            Line((9.4858578644, -4.1843458659), (10.0141421356, -3.6560615946))
            Line((10.0141421356, -3.6560615946), (10.0241421356, -3.6560615946))
            ThreePointArc((10.0241421356, -3.6560615946), (10.01, -3.9131326625), (10.01, -4.1702037303))
            Line((10.01, -4.1702037303), (10, -4.1802037303))
            ThreePointArc((10, -4.1802037303), (9.7429289322, -4.1802037303), (9.4858578644, -4.1943458659))
            Line((9.4858578644, -4.1943458659), (9.4858578644, -4.1843458659))
        make_face()
    revolve(axis=Axis((25, -30, 10), (0, 0, 1)), revolution_arc=F21_T4_ANGLE, mode=Mode.SUBTRACT)

    # F17 (on Top) → F22 (join)
    with BuildSketch(Plane.XY):
        with BuildLine():
            ThreePointArc((26.3228756555, -31.5), (26.8228756555, -30.8228756555), (27, -30))
            ThreePointArc((27, -30), (24.1771243445, -28.1771243445), (23.6771243445, -31.5))
            Line((23.6771243445, -31.5), (26.3228756555, -31.5))
        make_face()
        with BuildLine():
            Line((26.3228756555, -31.5), (23.6771243445, -31.5))
            ThreePointArc((23.6771243445, -31.5), (25, -32), (26.3228756555, -31.5))
        make_face()
    extrude(amount=-F22_DEPTH)


solid = Compound([f1.part, f1b.part, f7.part, f8_1.part, f8b_1.part, f8c_1.part, f16.part, f18.part])
